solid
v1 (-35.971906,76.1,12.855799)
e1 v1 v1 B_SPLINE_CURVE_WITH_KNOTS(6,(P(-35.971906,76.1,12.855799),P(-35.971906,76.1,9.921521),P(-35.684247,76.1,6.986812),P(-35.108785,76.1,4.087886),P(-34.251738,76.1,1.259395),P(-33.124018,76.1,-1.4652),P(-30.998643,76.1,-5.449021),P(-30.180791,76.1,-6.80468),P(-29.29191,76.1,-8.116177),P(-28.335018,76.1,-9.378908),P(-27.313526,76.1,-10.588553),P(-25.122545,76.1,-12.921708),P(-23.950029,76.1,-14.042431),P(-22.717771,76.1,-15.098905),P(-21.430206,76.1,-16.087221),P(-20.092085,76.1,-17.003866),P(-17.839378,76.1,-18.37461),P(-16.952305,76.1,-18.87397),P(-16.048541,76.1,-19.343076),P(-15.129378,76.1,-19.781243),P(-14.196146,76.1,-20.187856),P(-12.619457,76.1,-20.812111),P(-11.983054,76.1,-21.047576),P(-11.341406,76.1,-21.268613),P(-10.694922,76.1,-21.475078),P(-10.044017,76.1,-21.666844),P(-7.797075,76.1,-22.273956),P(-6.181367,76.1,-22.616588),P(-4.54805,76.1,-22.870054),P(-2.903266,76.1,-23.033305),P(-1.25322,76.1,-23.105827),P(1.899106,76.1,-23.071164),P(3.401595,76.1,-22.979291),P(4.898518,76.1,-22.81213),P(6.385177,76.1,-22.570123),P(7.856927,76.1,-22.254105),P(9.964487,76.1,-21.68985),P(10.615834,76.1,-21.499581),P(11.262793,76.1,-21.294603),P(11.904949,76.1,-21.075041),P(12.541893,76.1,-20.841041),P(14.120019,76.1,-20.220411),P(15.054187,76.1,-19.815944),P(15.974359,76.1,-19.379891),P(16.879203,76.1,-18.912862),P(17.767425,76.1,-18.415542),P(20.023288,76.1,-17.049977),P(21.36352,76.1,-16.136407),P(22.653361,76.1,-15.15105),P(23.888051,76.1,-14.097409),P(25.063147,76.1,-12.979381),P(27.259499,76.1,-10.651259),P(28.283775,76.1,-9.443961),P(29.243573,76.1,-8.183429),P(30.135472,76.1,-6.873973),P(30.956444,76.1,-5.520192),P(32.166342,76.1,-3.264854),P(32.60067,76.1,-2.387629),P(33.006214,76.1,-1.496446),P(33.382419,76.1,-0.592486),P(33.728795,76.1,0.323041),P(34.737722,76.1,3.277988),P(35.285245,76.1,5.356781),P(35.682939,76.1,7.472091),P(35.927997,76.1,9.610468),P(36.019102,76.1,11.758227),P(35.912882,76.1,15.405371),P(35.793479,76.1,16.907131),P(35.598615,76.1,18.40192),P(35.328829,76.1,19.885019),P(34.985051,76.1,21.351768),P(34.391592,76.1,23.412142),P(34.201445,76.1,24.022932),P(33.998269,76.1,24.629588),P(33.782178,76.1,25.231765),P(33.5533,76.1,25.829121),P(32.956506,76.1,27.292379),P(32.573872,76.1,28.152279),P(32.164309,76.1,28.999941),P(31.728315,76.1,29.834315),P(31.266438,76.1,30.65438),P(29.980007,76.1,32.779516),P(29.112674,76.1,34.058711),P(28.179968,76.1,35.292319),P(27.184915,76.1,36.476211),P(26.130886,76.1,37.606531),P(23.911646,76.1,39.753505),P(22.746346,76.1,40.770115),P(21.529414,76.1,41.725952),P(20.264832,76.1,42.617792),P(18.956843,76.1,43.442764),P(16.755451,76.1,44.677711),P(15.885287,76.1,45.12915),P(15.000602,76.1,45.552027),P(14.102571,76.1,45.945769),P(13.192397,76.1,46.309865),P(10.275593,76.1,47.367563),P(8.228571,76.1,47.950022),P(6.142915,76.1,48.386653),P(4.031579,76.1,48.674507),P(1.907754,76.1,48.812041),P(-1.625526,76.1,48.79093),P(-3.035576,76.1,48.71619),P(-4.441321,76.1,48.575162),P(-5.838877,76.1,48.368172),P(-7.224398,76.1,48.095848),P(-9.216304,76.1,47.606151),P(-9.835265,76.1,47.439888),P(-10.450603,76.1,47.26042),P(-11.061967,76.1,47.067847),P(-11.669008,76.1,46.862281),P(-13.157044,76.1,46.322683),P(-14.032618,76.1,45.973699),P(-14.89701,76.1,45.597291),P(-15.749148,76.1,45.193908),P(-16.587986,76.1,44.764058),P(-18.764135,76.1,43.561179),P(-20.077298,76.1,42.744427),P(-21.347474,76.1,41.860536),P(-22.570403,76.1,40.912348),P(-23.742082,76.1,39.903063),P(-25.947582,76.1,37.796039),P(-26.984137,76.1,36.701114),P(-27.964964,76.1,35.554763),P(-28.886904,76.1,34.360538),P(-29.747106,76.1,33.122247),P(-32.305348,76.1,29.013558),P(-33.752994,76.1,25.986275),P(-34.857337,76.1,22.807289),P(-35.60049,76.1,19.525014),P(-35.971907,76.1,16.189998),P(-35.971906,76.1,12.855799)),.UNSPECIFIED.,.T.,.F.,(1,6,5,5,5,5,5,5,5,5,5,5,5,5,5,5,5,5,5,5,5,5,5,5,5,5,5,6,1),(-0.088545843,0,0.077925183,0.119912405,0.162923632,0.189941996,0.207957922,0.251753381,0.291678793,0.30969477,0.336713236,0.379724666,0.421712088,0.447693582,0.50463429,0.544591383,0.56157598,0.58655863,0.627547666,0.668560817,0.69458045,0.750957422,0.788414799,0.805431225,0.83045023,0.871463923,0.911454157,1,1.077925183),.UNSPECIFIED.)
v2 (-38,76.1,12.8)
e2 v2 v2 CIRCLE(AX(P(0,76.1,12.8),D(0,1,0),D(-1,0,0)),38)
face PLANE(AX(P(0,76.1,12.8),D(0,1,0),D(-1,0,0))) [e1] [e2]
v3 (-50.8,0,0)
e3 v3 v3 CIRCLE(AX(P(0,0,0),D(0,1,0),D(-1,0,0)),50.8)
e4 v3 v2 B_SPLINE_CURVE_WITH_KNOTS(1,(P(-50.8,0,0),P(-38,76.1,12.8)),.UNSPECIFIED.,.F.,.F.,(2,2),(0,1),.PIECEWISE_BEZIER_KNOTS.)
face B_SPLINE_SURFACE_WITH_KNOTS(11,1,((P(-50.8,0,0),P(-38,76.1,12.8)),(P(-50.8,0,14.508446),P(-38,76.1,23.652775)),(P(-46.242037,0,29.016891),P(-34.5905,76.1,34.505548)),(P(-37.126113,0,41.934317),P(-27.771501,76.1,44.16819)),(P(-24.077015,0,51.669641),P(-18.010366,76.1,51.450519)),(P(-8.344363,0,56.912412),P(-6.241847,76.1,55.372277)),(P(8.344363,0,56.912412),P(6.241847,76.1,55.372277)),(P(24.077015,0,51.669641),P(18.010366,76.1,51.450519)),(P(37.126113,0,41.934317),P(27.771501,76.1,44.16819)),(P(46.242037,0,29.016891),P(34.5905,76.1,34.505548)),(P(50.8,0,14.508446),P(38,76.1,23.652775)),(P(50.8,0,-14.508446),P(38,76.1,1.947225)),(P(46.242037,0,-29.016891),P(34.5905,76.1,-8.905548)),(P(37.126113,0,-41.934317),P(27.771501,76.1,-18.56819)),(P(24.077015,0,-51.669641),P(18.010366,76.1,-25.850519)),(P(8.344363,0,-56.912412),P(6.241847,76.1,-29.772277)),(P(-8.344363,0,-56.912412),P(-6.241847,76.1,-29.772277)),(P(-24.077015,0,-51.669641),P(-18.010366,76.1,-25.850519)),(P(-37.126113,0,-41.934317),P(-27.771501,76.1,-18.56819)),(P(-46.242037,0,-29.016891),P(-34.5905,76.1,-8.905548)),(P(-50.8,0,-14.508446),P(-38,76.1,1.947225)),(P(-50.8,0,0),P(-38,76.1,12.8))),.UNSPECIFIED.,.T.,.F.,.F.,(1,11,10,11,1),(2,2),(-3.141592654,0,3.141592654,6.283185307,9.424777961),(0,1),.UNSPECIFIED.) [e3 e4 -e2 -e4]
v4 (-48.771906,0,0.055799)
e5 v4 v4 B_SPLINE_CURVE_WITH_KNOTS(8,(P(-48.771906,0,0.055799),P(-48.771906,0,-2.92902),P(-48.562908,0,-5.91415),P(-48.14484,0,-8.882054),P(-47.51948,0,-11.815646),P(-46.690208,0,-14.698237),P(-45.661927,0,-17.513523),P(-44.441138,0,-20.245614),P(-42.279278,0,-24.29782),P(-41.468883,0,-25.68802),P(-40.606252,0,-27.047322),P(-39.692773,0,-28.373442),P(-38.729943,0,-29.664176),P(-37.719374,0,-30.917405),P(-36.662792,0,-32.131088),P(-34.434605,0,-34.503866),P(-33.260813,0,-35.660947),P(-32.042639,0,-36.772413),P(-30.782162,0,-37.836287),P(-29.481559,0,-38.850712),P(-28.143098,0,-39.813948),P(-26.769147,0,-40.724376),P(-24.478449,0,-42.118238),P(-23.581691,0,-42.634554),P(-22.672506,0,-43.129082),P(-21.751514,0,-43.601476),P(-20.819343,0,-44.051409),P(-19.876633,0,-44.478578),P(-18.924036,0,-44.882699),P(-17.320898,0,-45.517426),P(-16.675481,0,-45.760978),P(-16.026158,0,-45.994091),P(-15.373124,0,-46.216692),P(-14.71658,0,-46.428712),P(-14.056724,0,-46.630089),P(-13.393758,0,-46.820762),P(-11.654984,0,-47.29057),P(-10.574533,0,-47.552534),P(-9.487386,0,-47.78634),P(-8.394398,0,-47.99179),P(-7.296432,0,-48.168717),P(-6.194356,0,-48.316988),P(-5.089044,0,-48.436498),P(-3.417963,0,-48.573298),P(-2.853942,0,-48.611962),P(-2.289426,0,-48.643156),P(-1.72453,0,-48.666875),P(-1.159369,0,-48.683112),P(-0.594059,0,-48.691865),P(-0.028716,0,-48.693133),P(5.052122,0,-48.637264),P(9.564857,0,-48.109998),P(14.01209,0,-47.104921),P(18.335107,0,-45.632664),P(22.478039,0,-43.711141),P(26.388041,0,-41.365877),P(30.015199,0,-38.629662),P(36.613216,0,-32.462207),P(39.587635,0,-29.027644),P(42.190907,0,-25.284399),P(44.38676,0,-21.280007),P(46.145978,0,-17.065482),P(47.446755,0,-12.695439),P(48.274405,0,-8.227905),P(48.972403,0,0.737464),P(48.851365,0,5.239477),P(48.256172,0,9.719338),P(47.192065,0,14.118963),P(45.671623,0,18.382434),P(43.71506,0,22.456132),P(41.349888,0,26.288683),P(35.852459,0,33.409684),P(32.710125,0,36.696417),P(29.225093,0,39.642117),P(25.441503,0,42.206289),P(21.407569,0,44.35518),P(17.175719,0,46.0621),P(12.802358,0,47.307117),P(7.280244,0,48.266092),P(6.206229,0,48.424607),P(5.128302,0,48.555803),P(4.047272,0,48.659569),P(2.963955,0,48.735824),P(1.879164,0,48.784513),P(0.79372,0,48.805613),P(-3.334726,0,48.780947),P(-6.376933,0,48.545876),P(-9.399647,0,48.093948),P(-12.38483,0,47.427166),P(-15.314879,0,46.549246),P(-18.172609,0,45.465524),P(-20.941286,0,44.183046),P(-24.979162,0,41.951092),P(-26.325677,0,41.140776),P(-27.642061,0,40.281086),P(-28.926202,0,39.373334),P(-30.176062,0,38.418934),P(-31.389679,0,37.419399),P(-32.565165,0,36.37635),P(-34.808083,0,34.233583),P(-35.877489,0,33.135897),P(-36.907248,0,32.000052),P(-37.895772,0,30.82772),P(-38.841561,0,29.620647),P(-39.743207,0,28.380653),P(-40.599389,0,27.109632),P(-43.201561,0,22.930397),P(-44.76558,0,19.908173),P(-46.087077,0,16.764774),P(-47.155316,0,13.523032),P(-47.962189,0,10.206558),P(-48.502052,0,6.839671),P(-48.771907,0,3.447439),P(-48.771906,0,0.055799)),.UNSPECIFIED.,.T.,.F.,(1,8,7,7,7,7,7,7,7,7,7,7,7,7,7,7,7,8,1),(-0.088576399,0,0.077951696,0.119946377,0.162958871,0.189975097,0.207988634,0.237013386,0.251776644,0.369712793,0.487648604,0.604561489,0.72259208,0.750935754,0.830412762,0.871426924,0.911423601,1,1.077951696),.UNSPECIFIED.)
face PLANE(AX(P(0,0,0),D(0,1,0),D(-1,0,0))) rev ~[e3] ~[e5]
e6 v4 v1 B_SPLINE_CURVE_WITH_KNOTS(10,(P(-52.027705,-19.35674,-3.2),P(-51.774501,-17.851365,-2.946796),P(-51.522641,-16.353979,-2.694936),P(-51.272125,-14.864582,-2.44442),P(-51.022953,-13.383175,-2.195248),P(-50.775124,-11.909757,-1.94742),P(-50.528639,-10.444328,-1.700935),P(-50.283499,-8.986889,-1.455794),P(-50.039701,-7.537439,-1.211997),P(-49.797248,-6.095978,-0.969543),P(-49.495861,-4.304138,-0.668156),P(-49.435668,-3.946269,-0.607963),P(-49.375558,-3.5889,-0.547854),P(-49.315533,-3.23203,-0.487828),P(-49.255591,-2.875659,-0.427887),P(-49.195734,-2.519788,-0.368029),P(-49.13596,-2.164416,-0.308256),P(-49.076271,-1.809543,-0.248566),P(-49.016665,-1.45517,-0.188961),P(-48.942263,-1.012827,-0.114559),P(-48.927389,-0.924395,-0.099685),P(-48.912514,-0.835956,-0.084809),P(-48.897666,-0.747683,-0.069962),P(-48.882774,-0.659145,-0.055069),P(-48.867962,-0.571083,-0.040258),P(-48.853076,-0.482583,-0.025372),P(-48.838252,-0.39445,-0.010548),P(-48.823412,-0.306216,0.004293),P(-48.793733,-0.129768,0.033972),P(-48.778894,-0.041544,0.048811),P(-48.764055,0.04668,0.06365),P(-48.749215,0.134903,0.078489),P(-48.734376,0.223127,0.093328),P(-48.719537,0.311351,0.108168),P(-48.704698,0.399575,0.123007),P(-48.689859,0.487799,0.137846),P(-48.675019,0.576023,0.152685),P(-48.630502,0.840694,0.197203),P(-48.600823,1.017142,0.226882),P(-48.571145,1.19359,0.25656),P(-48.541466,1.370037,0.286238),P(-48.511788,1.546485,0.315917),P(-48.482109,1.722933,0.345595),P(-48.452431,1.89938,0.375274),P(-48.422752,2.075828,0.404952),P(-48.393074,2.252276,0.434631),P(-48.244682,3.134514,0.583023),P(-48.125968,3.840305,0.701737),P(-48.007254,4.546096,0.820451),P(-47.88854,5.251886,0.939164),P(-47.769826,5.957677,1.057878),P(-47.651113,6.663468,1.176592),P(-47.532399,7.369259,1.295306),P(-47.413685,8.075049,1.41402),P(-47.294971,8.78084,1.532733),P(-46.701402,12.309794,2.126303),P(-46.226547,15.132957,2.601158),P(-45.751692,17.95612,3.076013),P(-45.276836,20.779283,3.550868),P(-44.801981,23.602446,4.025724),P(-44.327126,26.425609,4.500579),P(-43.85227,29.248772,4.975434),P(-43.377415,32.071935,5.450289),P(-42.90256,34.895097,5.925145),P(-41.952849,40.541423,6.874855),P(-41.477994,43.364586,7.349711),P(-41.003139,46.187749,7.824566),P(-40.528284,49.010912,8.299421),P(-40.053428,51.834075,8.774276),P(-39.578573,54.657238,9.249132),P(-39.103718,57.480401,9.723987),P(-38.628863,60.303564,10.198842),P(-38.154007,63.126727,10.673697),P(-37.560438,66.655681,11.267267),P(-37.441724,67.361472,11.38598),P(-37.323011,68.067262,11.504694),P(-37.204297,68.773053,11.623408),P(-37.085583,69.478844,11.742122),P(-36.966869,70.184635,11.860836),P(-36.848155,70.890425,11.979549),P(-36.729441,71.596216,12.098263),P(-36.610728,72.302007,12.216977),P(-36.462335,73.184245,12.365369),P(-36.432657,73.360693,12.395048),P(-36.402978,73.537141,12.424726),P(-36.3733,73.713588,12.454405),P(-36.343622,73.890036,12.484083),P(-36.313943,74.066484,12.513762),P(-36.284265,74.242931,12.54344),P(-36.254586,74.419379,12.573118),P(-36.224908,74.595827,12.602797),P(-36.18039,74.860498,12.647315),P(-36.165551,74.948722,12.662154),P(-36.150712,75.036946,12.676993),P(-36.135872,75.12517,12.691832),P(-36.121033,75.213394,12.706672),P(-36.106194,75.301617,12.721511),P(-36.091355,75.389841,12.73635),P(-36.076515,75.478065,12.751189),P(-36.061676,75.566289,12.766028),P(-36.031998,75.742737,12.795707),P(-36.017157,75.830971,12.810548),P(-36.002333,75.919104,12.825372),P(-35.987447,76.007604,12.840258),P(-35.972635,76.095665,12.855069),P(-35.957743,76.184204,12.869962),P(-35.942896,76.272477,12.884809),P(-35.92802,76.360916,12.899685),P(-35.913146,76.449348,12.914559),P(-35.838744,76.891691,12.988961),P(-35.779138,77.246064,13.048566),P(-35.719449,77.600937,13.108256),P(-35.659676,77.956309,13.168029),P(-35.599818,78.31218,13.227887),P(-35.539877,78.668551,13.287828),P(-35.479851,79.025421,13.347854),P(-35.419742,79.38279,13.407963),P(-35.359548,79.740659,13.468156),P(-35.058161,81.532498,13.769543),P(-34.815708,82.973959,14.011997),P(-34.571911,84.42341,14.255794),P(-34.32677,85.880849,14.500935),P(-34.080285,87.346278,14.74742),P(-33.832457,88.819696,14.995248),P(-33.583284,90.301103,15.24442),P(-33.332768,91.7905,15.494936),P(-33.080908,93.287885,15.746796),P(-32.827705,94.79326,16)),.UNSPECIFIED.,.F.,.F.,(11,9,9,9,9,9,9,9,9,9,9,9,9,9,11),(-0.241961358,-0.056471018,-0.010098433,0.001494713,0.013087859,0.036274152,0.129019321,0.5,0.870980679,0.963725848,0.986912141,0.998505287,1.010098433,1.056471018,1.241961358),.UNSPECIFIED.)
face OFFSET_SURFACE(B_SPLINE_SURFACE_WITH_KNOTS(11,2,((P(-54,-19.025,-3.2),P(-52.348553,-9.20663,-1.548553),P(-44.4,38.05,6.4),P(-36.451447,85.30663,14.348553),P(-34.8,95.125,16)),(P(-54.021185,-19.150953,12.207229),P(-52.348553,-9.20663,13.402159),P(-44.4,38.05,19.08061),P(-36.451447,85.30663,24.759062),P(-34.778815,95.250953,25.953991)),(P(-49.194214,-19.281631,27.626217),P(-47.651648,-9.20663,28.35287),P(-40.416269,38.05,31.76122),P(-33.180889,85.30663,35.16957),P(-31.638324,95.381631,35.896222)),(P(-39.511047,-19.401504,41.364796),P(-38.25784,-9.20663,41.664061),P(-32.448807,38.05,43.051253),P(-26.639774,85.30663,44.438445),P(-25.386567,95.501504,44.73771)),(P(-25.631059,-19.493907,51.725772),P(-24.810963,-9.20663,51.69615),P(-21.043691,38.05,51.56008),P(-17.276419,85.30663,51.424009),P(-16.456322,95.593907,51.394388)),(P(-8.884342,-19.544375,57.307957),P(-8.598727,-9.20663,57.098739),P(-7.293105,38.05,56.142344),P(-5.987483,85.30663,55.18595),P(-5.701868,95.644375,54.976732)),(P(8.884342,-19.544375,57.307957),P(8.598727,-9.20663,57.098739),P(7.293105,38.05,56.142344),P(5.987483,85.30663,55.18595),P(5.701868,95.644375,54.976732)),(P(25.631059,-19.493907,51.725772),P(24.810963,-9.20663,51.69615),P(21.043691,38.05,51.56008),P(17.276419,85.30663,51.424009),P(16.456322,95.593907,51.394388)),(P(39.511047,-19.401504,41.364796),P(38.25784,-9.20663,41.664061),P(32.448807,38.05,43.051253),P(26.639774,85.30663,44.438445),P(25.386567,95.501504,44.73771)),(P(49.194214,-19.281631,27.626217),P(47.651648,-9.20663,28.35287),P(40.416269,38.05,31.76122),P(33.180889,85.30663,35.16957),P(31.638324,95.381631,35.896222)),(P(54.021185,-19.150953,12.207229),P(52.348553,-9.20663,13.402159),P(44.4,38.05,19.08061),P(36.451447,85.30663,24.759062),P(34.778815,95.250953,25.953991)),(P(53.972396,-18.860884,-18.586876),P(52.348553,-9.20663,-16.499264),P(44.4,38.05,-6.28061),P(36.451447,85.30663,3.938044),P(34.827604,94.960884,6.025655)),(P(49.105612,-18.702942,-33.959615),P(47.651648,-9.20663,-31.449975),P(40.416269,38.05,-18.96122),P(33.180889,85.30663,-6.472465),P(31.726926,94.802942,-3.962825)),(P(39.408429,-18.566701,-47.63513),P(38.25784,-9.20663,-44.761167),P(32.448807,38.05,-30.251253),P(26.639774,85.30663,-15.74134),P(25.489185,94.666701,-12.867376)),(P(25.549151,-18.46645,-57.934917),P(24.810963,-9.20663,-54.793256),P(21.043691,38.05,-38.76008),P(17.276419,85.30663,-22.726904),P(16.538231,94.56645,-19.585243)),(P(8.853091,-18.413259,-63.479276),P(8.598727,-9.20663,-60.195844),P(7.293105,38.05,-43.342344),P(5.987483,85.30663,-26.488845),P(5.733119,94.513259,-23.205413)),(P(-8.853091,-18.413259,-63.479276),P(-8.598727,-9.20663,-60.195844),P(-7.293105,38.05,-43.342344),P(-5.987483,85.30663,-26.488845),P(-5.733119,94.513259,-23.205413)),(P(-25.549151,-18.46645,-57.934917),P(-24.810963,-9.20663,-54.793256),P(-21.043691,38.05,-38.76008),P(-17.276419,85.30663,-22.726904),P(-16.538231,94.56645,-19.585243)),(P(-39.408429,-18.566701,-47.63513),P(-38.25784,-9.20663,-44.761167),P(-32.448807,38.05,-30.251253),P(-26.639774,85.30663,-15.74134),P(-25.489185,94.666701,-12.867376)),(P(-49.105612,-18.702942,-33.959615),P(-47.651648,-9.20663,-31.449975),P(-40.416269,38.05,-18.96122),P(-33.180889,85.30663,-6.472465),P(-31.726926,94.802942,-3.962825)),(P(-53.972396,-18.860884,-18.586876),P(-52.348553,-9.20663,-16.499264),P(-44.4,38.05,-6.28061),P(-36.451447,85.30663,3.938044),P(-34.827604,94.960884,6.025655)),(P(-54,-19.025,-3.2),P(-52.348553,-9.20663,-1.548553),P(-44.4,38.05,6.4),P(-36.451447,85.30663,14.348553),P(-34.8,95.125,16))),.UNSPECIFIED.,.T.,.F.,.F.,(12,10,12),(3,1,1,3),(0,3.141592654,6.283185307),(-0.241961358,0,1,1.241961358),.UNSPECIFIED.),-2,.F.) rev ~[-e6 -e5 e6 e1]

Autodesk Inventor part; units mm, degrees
ref_plane "YZ Plane" through (0, 0, 0) normal (1, 0, 0) x (0, 1, 0)
ref_plane "XY Plane" through (0, 0, 0) normal (0, 0, 1) x (1, 0, 0)
sketch "Szkic6" plane through (0, 0, 0) normal (0, 1, 0) x (-1, 0, 0)
  circle A0 centre (0, 0) radius 50.8
  dimension "d33" = 101.6
ref_plane "Płaszczyzna konstrukcyjna1" through (0, 76.1, 0) normal (0, 1, 0) x (-1, 0, 0)
sketch "Szkic7" plane through (0, 76.1, 0) normal (0, 1, 0) x (-1, 0, 0)
  circle A0 centre (0, 12.8) radius 38
  line L0 (0, -20.3) -> (0, 20.3) construction
  circle A1 centre (0, 0) radius 50.8 construction
  dimension "d35" = 76
loft "Wyciągnięcie złożone1" add profiles "Szkic6", "Szkic7"
shell "Skorupa1" thickness 2 removed faces 2 at (-7.8975, 76.1, 22.7032) at (7.3018, 0, 11.5135)
equation "\"d33\" = OD1"
equation "\"d35\" = OD2"
equation "\"d52\" = THK"
equation "\"SzerokośćGięciaPodcięcia\" = Grubość"
equation "\"RozmiarPodcięciaNarożnika\" = 4 * Grubość"
equation "\"PromieńPrzejścia\" = PromieńGięcia"
equation "\"Rozmiar_promienia_Jacobiego\" = PromieńGięcia"
equation "\"Wielk_odstępu\" = Grubość"
equation "\"d2\" = PromieńGięcia"
equation "\"d23\" = PromieńGięcia"
equation "\"OD1\" = 101.6"
equation "\"OD2\" = 76"
equation "\"L\" = 76.1"
equation "\"THK\" = 2"
equation "\"d34\" = L"
equation "\"Grubość\" = 1.5"
equation "\"PromieńGięcia\" = 3"
properties part number "Redukcja asymetryczna Ø101,6x76x2 L=76,1" material "304"
